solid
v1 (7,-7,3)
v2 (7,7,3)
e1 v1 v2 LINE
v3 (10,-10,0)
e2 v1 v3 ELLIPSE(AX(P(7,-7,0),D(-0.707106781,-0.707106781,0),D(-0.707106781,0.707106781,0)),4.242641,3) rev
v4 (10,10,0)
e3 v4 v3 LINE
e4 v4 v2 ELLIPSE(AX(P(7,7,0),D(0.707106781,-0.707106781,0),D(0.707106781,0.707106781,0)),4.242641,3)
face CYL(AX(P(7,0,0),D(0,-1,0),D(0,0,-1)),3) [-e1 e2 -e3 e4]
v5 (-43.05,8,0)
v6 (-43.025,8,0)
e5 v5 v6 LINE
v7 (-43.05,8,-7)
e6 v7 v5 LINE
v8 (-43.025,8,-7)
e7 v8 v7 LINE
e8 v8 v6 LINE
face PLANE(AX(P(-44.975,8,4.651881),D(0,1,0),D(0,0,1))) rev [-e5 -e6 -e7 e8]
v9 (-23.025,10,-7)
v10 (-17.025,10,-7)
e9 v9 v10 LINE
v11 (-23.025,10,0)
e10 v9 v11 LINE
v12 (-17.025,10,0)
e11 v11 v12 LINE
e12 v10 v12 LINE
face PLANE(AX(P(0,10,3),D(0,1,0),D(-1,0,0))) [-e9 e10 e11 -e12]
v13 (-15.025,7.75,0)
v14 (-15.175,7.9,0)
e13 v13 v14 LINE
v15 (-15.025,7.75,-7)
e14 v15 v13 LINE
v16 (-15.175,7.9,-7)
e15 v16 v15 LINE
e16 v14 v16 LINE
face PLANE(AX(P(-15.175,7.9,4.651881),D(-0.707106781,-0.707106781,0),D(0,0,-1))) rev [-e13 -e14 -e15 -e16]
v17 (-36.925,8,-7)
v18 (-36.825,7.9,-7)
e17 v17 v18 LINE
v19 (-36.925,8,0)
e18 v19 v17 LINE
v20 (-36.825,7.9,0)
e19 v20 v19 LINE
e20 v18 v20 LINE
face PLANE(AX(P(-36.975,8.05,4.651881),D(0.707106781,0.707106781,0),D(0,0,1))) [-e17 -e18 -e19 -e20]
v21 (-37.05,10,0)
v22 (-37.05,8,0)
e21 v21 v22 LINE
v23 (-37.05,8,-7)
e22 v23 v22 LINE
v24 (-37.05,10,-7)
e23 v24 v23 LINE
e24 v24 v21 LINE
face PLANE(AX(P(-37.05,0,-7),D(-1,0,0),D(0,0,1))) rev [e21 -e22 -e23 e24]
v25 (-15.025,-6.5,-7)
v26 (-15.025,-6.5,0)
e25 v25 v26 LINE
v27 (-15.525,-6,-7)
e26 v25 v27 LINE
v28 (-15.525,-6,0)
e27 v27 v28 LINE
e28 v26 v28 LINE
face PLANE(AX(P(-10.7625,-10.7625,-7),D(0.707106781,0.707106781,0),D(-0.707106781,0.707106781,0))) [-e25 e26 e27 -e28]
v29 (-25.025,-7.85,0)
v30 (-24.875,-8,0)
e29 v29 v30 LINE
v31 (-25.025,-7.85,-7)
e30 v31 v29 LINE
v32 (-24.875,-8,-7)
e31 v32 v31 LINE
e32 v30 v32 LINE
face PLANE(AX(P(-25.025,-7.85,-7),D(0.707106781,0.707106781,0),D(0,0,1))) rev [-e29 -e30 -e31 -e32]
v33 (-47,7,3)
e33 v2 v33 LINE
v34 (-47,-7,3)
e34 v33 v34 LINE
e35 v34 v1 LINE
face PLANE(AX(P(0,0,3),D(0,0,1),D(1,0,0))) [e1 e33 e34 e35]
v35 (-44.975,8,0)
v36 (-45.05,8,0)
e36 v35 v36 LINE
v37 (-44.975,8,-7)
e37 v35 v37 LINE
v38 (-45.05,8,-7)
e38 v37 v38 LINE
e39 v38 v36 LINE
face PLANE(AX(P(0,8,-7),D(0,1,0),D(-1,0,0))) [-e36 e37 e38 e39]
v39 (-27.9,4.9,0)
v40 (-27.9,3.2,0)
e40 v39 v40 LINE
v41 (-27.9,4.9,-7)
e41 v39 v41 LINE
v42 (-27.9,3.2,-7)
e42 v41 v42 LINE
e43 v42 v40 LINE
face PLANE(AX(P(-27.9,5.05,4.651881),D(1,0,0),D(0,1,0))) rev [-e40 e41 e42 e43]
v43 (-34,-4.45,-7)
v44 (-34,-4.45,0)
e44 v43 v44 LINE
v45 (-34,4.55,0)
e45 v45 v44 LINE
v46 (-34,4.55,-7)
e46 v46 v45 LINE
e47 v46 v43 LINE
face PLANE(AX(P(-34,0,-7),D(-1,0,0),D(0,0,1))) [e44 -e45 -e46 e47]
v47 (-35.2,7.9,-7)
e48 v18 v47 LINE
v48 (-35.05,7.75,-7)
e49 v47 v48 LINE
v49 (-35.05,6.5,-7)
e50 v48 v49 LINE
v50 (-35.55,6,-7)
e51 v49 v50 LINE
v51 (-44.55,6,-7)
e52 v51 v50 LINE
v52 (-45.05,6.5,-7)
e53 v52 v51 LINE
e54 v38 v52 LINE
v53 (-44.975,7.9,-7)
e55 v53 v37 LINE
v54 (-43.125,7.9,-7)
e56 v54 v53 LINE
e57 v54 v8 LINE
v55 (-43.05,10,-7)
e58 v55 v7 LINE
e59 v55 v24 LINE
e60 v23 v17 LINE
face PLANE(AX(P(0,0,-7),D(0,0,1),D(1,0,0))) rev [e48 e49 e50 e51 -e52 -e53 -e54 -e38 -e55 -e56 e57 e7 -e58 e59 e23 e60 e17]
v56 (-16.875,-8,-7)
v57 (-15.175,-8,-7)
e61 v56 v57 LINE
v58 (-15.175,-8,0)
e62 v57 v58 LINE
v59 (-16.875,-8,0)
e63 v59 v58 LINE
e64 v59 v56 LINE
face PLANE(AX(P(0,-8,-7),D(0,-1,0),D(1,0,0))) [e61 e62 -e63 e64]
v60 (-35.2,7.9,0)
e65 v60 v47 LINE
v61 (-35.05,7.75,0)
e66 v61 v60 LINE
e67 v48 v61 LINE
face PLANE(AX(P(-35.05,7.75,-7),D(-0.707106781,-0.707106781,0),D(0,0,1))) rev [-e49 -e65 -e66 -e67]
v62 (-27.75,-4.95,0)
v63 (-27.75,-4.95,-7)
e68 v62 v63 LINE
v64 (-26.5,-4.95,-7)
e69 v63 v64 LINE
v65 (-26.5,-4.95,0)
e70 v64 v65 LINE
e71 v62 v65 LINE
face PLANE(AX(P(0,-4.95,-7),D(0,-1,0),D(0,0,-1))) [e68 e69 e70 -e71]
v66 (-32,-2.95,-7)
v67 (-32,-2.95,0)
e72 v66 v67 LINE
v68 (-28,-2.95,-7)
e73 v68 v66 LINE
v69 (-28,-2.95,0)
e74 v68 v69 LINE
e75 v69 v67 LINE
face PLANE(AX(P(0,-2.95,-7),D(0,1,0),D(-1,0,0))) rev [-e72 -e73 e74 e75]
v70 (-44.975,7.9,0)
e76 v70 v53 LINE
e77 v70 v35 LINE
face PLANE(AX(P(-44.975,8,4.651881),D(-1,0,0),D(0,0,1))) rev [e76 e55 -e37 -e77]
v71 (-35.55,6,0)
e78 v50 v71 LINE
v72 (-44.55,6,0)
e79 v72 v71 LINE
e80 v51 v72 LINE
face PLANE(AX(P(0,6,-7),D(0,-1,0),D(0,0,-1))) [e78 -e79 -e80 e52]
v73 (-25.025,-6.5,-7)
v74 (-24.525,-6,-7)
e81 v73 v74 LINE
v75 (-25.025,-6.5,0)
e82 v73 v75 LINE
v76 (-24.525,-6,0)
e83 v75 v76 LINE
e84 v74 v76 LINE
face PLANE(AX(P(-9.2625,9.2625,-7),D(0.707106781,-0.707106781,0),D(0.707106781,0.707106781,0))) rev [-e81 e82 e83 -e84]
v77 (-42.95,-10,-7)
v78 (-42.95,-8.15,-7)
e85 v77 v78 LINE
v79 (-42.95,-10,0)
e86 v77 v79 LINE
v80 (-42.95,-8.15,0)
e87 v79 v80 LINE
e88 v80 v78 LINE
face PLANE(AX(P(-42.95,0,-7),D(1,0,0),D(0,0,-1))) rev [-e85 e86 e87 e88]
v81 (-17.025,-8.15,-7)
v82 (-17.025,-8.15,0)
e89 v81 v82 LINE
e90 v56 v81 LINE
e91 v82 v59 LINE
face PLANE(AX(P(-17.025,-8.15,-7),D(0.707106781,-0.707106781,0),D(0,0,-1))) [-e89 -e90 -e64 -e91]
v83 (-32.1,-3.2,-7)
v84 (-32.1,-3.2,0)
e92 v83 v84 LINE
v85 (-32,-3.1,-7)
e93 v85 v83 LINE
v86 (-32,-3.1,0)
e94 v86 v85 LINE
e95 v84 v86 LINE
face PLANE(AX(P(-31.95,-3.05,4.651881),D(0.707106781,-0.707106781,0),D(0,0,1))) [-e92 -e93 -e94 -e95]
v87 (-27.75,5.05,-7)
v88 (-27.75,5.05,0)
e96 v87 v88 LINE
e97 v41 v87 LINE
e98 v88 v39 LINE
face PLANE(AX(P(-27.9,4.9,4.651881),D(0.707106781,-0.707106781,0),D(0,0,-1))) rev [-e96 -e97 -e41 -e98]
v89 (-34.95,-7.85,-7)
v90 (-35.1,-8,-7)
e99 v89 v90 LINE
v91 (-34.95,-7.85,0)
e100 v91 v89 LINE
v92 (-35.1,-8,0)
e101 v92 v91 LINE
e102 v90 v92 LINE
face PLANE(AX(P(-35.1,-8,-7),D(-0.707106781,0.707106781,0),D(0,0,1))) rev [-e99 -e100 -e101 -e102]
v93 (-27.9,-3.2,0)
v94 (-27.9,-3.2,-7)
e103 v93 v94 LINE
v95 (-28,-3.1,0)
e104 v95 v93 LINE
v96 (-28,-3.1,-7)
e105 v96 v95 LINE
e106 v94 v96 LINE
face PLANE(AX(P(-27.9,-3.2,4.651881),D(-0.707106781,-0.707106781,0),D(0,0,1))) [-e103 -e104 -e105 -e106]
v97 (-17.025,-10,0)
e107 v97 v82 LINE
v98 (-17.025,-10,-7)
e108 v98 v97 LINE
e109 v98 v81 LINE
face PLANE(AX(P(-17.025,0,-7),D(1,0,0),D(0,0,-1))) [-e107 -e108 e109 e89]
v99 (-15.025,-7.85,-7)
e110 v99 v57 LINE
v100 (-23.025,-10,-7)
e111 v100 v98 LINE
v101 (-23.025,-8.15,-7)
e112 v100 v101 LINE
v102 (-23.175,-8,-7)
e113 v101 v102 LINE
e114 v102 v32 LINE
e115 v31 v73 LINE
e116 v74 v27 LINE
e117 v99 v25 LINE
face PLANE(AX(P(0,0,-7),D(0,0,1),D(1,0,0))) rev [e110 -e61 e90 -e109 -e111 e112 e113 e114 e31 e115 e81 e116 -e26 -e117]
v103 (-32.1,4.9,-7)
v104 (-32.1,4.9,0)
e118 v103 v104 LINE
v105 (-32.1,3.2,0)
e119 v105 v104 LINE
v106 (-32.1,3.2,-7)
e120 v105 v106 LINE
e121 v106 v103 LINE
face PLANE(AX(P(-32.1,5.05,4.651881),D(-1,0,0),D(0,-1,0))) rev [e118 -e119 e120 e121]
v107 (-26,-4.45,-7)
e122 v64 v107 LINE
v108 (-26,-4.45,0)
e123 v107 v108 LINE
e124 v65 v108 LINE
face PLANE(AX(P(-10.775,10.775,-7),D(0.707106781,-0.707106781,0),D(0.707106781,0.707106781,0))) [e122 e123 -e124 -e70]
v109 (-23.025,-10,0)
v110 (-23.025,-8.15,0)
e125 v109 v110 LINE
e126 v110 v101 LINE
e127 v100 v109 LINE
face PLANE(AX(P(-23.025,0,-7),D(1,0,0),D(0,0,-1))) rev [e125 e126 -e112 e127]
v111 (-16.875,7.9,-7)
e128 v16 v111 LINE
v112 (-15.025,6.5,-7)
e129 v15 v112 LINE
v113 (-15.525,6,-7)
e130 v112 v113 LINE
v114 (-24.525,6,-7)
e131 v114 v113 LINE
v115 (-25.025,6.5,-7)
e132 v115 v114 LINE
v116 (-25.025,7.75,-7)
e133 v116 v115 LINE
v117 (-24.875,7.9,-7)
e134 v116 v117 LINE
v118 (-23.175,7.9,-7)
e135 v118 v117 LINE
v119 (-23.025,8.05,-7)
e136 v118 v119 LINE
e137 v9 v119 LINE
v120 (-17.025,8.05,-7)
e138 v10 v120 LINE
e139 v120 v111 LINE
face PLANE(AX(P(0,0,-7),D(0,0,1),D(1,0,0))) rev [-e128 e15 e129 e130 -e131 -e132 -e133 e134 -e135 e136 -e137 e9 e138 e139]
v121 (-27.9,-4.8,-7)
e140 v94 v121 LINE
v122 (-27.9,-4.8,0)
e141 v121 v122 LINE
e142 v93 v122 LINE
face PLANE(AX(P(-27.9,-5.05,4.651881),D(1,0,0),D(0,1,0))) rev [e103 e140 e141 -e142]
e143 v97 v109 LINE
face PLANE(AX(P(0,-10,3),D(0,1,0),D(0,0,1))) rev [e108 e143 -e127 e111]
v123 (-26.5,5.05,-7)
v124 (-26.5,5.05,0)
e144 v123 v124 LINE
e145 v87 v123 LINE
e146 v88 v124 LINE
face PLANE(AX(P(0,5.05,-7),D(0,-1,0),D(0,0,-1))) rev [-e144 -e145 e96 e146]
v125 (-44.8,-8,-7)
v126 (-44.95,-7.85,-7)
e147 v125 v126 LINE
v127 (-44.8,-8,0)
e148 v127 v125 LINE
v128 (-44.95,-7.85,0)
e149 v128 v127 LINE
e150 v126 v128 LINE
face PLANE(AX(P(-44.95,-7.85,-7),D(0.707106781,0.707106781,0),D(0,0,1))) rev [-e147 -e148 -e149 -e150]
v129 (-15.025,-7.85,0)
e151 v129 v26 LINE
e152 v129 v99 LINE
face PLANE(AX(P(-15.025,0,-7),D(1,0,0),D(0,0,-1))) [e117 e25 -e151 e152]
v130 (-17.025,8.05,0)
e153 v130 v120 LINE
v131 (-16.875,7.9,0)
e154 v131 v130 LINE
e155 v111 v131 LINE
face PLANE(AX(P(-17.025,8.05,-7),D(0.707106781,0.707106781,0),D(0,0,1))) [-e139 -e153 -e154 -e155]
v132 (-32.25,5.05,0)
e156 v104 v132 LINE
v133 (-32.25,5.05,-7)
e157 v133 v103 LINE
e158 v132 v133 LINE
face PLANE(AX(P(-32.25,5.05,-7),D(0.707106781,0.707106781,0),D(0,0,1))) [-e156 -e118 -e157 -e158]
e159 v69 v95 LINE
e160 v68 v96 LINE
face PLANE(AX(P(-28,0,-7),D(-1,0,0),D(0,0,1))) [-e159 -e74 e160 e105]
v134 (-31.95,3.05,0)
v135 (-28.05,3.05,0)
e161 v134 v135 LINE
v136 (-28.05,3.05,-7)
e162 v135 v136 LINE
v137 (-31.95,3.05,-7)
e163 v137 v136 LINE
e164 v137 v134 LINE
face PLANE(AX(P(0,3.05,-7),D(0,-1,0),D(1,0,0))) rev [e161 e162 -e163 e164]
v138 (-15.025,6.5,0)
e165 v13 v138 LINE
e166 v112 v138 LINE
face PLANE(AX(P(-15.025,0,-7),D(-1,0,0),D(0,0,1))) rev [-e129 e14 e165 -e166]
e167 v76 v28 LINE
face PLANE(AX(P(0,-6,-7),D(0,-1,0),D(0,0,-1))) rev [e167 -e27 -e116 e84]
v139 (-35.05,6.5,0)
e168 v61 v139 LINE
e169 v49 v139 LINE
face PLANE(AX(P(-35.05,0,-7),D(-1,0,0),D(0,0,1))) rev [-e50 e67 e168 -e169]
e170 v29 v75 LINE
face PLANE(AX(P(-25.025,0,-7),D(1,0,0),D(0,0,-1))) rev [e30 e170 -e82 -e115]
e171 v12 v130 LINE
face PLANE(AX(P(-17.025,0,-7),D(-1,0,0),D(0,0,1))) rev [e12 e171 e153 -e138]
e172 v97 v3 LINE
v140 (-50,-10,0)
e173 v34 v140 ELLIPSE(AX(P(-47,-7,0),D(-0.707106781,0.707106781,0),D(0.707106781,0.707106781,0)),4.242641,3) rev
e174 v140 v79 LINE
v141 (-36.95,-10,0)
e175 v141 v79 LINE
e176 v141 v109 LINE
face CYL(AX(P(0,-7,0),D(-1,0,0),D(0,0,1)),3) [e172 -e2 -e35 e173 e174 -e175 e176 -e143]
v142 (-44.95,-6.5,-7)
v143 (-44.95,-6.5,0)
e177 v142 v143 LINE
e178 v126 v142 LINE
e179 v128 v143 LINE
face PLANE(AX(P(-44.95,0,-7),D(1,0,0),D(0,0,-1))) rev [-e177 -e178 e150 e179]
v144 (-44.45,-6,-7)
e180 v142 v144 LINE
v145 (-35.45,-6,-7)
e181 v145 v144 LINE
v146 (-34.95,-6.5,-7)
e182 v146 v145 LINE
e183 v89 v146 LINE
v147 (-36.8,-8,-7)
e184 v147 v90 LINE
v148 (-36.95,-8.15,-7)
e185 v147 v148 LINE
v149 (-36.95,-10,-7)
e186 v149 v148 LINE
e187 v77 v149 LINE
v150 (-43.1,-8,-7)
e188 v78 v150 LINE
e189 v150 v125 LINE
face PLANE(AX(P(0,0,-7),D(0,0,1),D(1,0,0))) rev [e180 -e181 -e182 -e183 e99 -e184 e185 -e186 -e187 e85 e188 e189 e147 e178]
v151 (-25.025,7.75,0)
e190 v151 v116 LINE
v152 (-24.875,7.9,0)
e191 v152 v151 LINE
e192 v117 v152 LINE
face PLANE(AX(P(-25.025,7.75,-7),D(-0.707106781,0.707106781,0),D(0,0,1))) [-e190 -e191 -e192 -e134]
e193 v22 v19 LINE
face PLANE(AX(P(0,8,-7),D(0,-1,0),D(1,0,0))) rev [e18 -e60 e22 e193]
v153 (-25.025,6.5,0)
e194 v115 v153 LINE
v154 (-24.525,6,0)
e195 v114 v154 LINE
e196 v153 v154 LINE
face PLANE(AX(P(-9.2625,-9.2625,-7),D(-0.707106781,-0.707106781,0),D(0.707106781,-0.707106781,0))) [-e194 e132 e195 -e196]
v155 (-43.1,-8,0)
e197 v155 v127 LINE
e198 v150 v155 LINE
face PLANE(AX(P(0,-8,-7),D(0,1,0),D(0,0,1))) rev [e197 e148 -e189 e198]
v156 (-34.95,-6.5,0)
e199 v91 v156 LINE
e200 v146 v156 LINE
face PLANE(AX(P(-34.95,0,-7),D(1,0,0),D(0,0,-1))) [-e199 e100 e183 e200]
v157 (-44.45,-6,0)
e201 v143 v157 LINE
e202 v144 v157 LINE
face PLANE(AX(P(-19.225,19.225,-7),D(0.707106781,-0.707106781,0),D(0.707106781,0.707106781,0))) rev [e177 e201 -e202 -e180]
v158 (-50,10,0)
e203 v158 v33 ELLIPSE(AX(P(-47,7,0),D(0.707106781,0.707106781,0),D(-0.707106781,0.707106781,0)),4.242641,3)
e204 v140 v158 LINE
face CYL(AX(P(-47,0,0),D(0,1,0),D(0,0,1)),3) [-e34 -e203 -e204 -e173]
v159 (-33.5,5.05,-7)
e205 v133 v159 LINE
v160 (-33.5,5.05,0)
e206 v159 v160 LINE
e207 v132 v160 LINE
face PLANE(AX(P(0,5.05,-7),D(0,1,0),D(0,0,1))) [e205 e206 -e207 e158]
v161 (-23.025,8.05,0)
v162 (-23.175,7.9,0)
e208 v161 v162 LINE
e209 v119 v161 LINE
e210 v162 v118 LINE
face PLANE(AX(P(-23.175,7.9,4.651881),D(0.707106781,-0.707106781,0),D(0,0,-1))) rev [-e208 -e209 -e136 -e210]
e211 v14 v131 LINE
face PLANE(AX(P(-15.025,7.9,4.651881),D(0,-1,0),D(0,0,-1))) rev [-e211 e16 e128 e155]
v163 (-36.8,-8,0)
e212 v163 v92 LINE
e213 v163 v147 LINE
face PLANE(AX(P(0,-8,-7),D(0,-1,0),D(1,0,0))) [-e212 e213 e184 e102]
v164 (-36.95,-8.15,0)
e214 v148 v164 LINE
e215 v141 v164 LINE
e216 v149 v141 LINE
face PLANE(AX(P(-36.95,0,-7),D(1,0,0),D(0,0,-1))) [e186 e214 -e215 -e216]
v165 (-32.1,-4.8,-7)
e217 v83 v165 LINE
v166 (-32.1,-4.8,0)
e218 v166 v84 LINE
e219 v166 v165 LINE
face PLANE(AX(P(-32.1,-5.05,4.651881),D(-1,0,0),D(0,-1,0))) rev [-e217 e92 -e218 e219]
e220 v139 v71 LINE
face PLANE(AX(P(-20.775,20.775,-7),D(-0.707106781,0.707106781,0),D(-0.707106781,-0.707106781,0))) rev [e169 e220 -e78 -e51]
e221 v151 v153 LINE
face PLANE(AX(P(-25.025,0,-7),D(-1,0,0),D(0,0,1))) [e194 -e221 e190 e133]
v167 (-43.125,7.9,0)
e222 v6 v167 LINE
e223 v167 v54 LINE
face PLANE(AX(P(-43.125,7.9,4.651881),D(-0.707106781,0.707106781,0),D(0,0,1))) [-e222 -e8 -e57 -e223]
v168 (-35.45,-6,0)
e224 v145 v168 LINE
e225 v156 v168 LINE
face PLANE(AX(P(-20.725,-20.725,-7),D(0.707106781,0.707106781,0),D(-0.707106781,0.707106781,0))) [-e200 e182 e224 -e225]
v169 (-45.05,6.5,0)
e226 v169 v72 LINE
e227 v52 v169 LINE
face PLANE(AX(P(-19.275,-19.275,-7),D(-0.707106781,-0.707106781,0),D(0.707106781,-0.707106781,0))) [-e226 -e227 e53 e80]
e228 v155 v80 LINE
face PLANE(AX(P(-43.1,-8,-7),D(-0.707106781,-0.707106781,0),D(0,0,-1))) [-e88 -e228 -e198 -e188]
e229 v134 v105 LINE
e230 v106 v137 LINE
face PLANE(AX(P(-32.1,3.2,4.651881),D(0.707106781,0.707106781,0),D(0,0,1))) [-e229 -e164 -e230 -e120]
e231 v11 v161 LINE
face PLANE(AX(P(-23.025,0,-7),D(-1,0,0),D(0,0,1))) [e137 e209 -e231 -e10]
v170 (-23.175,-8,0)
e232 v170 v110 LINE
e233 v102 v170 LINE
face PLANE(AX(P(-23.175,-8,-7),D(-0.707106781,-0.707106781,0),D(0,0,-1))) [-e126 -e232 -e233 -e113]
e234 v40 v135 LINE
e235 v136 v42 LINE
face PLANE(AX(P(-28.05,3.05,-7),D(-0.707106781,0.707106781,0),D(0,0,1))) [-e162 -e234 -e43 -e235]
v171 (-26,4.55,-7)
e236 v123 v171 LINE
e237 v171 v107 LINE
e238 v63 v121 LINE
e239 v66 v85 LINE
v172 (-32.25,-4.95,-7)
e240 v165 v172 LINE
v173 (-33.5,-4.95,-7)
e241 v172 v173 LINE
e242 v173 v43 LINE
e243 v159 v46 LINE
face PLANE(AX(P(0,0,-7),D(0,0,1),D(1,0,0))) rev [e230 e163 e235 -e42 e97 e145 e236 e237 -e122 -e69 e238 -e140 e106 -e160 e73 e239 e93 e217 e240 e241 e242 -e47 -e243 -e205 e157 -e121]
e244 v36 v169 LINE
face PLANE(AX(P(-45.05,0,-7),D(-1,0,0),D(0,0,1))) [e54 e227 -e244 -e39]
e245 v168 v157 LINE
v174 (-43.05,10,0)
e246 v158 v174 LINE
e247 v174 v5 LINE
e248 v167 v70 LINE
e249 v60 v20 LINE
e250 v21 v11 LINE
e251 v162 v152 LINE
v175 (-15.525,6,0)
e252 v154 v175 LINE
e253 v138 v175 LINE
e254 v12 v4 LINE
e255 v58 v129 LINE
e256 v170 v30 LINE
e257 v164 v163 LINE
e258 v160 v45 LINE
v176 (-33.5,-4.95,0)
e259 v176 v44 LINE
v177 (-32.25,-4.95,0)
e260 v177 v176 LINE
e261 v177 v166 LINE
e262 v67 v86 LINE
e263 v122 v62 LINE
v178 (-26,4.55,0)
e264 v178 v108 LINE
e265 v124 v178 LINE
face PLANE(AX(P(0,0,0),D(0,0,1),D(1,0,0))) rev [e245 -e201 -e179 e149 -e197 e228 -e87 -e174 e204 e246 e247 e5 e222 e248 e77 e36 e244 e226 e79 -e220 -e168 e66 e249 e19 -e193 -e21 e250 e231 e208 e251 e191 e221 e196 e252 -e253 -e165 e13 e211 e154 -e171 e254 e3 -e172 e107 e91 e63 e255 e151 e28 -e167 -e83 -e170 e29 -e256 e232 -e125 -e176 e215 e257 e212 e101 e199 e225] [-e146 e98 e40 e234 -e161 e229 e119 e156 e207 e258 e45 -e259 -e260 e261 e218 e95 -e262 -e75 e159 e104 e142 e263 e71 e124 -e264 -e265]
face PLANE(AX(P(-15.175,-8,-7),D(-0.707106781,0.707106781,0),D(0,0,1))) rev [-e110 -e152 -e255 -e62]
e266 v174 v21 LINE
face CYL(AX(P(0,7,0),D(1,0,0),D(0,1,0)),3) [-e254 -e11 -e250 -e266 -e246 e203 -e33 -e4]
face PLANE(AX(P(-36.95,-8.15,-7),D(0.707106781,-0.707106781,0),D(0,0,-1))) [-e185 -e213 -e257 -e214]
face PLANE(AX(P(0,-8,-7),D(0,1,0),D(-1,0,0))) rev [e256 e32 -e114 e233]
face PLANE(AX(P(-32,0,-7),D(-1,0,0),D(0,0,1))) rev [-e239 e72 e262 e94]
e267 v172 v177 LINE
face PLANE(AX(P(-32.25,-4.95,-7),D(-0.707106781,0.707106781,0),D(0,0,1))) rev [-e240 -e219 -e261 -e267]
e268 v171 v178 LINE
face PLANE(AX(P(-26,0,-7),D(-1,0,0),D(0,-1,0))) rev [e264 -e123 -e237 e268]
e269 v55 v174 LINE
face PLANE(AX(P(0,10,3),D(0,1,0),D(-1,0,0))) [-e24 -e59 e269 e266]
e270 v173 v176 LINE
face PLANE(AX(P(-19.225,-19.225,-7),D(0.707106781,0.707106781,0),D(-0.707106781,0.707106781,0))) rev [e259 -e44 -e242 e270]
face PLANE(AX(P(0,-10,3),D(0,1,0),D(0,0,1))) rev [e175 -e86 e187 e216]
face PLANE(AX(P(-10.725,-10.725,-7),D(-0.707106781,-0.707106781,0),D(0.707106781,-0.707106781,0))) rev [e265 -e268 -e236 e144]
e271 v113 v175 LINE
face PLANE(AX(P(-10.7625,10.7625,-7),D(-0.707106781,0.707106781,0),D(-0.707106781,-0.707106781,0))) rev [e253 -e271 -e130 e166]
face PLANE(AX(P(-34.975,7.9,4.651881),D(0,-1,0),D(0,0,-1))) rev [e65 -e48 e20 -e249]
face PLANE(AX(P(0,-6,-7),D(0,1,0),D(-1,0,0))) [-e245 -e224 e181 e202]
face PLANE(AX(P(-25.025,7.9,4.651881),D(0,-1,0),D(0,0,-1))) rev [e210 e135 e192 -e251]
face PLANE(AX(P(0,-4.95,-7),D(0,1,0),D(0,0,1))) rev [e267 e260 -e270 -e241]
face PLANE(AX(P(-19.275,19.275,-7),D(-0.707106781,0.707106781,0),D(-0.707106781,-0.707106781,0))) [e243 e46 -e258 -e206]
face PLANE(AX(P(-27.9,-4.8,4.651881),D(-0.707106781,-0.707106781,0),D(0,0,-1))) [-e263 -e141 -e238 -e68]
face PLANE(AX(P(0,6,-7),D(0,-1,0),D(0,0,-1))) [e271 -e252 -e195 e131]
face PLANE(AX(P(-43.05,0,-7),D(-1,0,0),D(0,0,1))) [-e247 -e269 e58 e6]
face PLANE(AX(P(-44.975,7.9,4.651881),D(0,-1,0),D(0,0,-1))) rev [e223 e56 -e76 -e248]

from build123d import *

# Parameters (mm, degrees)
SKETCH_1_W          = 60
SKETCH_1_H          = 20
EXTRUDE_1_DEPTH     = 3
EXTRUDE_3_DEPTH     = 7
SKETCH_5_W          = 2
SKETCH_5_H          = 0.1
SKETCH_5_W_2        = 4.2
SKETCH_5_H_2        = 2
CUT_EXTRUDE_2_DEPTH = 7
CHAMFER_1_SIZE      = 0.15
FILLET_1_R          = 3


# Some blends are built 0.0001 mm under size
with BuildPart() as part:
    # 草图1 → 凸台-拉伸1 (new body)
    with BuildSketch(Plane.XY):
        with Locations((-20, 0)):
            Rectangle(SKETCH_1_W, SKETCH_1_H)
    extrude(amount=EXTRUDE_1_DEPTH)

    # 草图1<5> → 凸台-拉伸3 (add)
    with BuildSketch(Plane.XY):
        Polygon((-17.025, 10), (-23.025, 10), (-23.025, 8), (-25.025, 8), (-25.025, 6.5), (-24.525, 6), (-15.525, 6), (-15.025, 6.5), (-15.025, 8), (-17.025, 8), align=None)
        Polygon((-37.05, 10), (-43.05, 10), (-43.05, 8), (-45.05, 8), (-45.05, 6.5), (-44.55, 6), (-35.55, 6), (-35.05, 6.5), (-35.05, 8), (-37.05, 8), align=None)
        Polygon((-26, 4.55), (-26, -4.45), (-26.5, -4.95), (-28, -4.95), (-28, -2.95), (-32, -2.95), (-32, -4.95), (-33.5, -4.95), (-34, -4.45), (-34, 4.55), (-33.5, 5.05), (-32, 5.05), (-32, 3.05), (-28, 3.05), (-28, 5.05), (-26.5, 5.05), align=None)
        Polygon((-23.025, -8), (-23.025, -10), (-17.025, -10), (-17.025, -8), (-15.025, -8), (-15.025, -6.5), (-15.525, -6), (-24.525, -6), (-25.025, -6.5), (-25.025, -8), align=None)
        Polygon((-42.95, -8), (-42.95, -10), (-36.95, -10), (-36.95, -8), (-34.95, -8), (-34.95, -6.5), (-35.45, -6), (-44.45, -6), (-44.95, -6.5), (-44.95, -8), align=None)
    extrude(amount=-EXTRUDE_3_DEPTH)

    # 草图5 → 切除-拉伸2 (cut)
    with BuildSketch(Plane(origin=(0, 0, -7), x_dir=(-1, 0, 0), z_dir=(0, 0, -1))):
        with Locations((16.025, 7.95)):
            Rectangle(SKETCH_5_W, SKETCH_5_H)
        with Locations((24.025, 7.95)):
            Rectangle(SKETCH_5_W, SKETCH_5_H)
        with Locations((35.975, 7.95)):
            Rectangle(SKETCH_5_W, SKETCH_5_H)
        with Locations((43.975, 7.95)):
            Rectangle(SKETCH_5_W, SKETCH_5_H)
        with Locations((30, 4.05)):
            Rectangle(SKETCH_5_W_2, SKETCH_5_H_2)
        with Locations((30, -4.05)):
            Rectangle(SKETCH_5_W_2, SKETCH_5_H_2)
    extrude(amount=-CUT_EXTRUDE_2_DEPTH, mode=Mode.SUBTRACT)

    # 倒角1
    # the kernel refuses this chamfer: 0.15 mm, written as the material it adds along each edge
    with BuildSketch(Plane(origin=(-32.1, -3.05, -7), x_dir=(-0.027495876610573042, -0.9996219169112971, 0), z_dir=(0, 0, 1))) as chamfer_1_piece_1_section:
        Polygon((CHAMFER_1_SIZE * 0.999621916911, CHAMFER_1_SIZE * 0.0274958766106), (-CHAMFER_1_SIZE * 0.0274958766106, CHAMFER_1_SIZE * 0.999621916911), (0, 0), align=None)
    chamfer_1_piece_1 = extrude(amount=7, mode=Mode.PRIVATE)
    chamfer_1_piece_1 = split(chamfer_1_piece_1, bisect_by=Plane(origin=(-32, -3.10460455, -3.5), z_dir=(-1, 0, 0)), keep=Keep.TOP, mode=Mode.PRIVATE)
    add(chamfer_1_piece_1)
    with BuildSketch(Plane(origin=(-32.1, -3.05, -7), x_dir=(-0.027495876610573042, -0.9996219169112971, 0), z_dir=(0, 0, 1))) as chamfer_1_piece_2_section:
        Polygon((CHAMFER_1_SIZE * 0.999621916911, CHAMFER_1_SIZE * 0.0274958766106), (-CHAMFER_1_SIZE * 0.0274958766106, CHAMFER_1_SIZE * 0.999621916911), (0, 0), align=None)
    chamfer_1_piece_2 = extrude(amount=7.385752448, mode=Mode.PRIVATE)
    chamfer_1_piece_2 = split(chamfer_1_piece_2, bisect_by=Plane(origin=(-32.060343707, -3.10460455, 0), z_dir=(0, 0, 1)), keep=Keep.TOP, mode=Mode.PRIVATE)
    chamfer_1_piece_2 = split(chamfer_1_piece_2, bisect_by=Plane(origin=(-32, -3.10460455, 0.192876224), z_dir=(-1, 0, 0)), keep=Keep.TOP, mode=Mode.PRIVATE)
    add(chamfer_1_piece_2)
    with BuildSketch(Plane(origin=(-32.1, -3.05, -7), x_dir=(-0.027495876610573042, -0.9996219169112971, 0), z_dir=(0, 0, 1))) as chamfer_1_piece_3_section:
        Polygon((CHAMFER_1_SIZE * 0.999621916911, CHAMFER_1_SIZE * 0.0274958766106), (-CHAMFER_1_SIZE * 0.0274958766106, CHAMFER_1_SIZE * 0.999621916911), (0, 0), align=None)
    chamfer_1_piece_3 = extrude(amount=7.385752448, mode=Mode.PRIVATE)
    chamfer_1_piece_3 = split(chamfer_1_piece_3, bisect_by=Plane(origin=(-31.98101474, -3.063087711, 0), z_dir=(0, 0, 1)), keep=Keep.TOP, mode=Mode.PRIVATE)
    chamfer_1_piece_3 = split(chamfer_1_piece_3, bisect_by=Plane(origin=(-32, -3.063087711, 0.192876224), z_dir=(1, 0, 0)), keep=Keep.TOP, mode=Mode.PRIVATE)
    add(chamfer_1_piece_3)
    with BuildSketch(Plane(origin=(-27.9, -3.05, -7), x_dir=(-0.9996219169112968, 0.027495876610587344, 0), z_dir=(0, 0, 1))) as chamfer_1_piece_4_section:
        Polygon((CHAMFER_1_SIZE * 0.999621916911, CHAMFER_1_SIZE * 0.0274958766106), (-CHAMFER_1_SIZE * 0.0274958766106, CHAMFER_1_SIZE * 0.999621916911), (0, 0), align=None)
    chamfer_1_piece_4 = extrude(amount=7, mode=Mode.PRIVATE)
    chamfer_1_piece_4 = split(chamfer_1_piece_4, bisect_by=Plane(origin=(-28, -3.10460455, -3.5), z_dir=(1, 0, 0)), keep=Keep.TOP, mode=Mode.PRIVATE)
    add(chamfer_1_piece_4)
    with BuildSketch(Plane(origin=(-27.9, -3.05, -7), x_dir=(-0.9996219169112968, 0.027495876610587344, 0), z_dir=(0, 0, 1))) as chamfer_1_piece_5_section:
        Polygon((CHAMFER_1_SIZE * 0.999621916911, CHAMFER_1_SIZE * 0.0274958766106), (-CHAMFER_1_SIZE * 0.0274958766106, CHAMFER_1_SIZE * 0.999621916911), (0, 0), align=None)
    chamfer_1_piece_5 = extrude(amount=7.385752448, mode=Mode.PRIVATE)
    chamfer_1_piece_5 = split(chamfer_1_piece_5, bisect_by=Plane(origin=(-28.01898526, -3.063087711, 0), z_dir=(0, 0, 1)), keep=Keep.TOP, mode=Mode.PRIVATE)
    chamfer_1_piece_5 = split(chamfer_1_piece_5, bisect_by=Plane(origin=(-28, -3.063087711, 0.192876224), z_dir=(-1, 0, 0)), keep=Keep.TOP, mode=Mode.PRIVATE)
    add(chamfer_1_piece_5)
    with BuildSketch(Plane(origin=(-27.9, -3.05, -7), x_dir=(-0.9996219169112968, 0.027495876610587344, 0), z_dir=(0, 0, 1))) as chamfer_1_piece_6_section:
        Polygon((CHAMFER_1_SIZE * 0.999621916911, CHAMFER_1_SIZE * 0.0274958766106), (-CHAMFER_1_SIZE * 0.0274958766106, CHAMFER_1_SIZE * 0.999621916911), (0, 0), align=None)
    chamfer_1_piece_6 = extrude(amount=7.385752448, mode=Mode.PRIVATE)
    chamfer_1_piece_6 = split(chamfer_1_piece_6, bisect_by=Plane(origin=(-27.939656293, -3.10460455, 0), z_dir=(0, 0, 1)), keep=Keep.TOP, mode=Mode.PRIVATE)
    chamfer_1_piece_6 = split(chamfer_1_piece_6, bisect_by=Plane(origin=(-28, -3.10460455, 0.192876224), z_dir=(1, 0, 0)), keep=Keep.TOP, mode=Mode.PRIVATE)
    add(chamfer_1_piece_6)
    with BuildSketch(Plane(origin=(-32.1, 3.05, -7), x_dir=(0.9996219169112968, -0.027495876610587344, 0), z_dir=(0, 0, 1)), Plane(origin=(-27.9, 3.05, -7), x_dir=(0.02749587661059597, 0.9996219169112964, 0), z_dir=(0, 0, 1)), Plane(origin=(-42.975, 7.9, -7), x_dir=(0.027495876610572963, 0.9996219169112971, 0), z_dir=(0, 0, 1)), Plane(origin=(-23.025, 7.9, -7), x_dir=(0.02749587661059597, 0.9996219169112964, 0), z_dir=(0, 0, 1)), Plane(origin=(-17.025, 7.9, -7), x_dir=(0.9996219169112968, -0.027495876610584464, 0), z_dir=(0, 0, 1))) as chamfer_1_piece_7:
        Polygon((CHAMFER_1_SIZE * 0.999621916911, CHAMFER_1_SIZE * 0.0274958766106), (-CHAMFER_1_SIZE * 0.0274958766106, CHAMFER_1_SIZE * 0.999621916911), (0, 0), align=None)
    extrude(amount=7.385752448)
    with BuildSketch(Plane(origin=(-36.975, 7.9, -7), x_dir=(0.9996219169112968, -0.0274958766105851, 0), z_dir=(0, 0, 1))) as chamfer_1_piece_8_section:
        Polygon((CHAMFER_1_SIZE * 0.999621916911, CHAMFER_1_SIZE * 0.0274958766106), (-CHAMFER_1_SIZE * 0.0274958766106, CHAMFER_1_SIZE * 0.999621916911), (0, 0), align=None)
    chamfer_1_piece_8 = extrude(amount=7, mode=Mode.PRIVATE)
    chamfer_1_piece_8 = split(chamfer_1_piece_8, bisect_by=Plane(origin=(-36.92039545, 8, -3.5), z_dir=(0, -1, 0)), keep=Keep.TOP, mode=Mode.PRIVATE)
    add(chamfer_1_piece_8)
    with BuildSketch(Plane(origin=(-36.975, 7.9, -7), x_dir=(0.9996219169112968, -0.0274958766105851, 0), z_dir=(0, 0, 1))) as chamfer_1_piece_9_section:
        Polygon((CHAMFER_1_SIZE * 0.999621916911, CHAMFER_1_SIZE * 0.0274958766106), (-CHAMFER_1_SIZE * 0.0274958766106, CHAMFER_1_SIZE * 0.999621916911), (0, 0), align=None)
    chamfer_1_piece_9 = extrude(amount=7.385752448, mode=Mode.PRIVATE)
    chamfer_1_piece_9 = split(chamfer_1_piece_9, bisect_by=Plane(origin=(-36.92039545, 7.939656293, 0), z_dir=(0, 0, 1)), keep=Keep.TOP, mode=Mode.PRIVATE)
    chamfer_1_piece_9 = split(chamfer_1_piece_9, bisect_by=Plane(origin=(-36.92039545, 8, 0.192876224), z_dir=(0, -1, 0)), keep=Keep.TOP, mode=Mode.PRIVATE)
    add(chamfer_1_piece_9)
    with BuildSketch(Plane(origin=(-36.975, 7.9, -7), x_dir=(0.9996219169112968, -0.0274958766105851, 0), z_dir=(0, 0, 1))) as chamfer_1_piece_10_section:
        Polygon((CHAMFER_1_SIZE * 0.999621916911, CHAMFER_1_SIZE * 0.0274958766106), (-CHAMFER_1_SIZE * 0.0274958766106, CHAMFER_1_SIZE * 0.999621916911), (0, 0), align=None)
    chamfer_1_piece_10 = extrude(amount=7.385752448, mode=Mode.PRIVATE)
    chamfer_1_piece_10 = split(chamfer_1_piece_10, bisect_by=Plane(origin=(-36.961912289, 8.01898526, 0), z_dir=(0, 0, 1)), keep=Keep.TOP, mode=Mode.PRIVATE)
    chamfer_1_piece_10 = split(chamfer_1_piece_10, bisect_by=Plane(origin=(-36.961912289, 8, 0.192876224), z_dir=(0, 1, 0)), keep=Keep.TOP, mode=Mode.PRIVATE)
    add(chamfer_1_piece_10)
    with BuildSketch(Plane(origin=(-36.95, -8, 0.385752448), x_dir=(-0.027495876610572963, -0.9996219169112971, 0), z_dir=(0, 0, -1)), Plane(origin=(-42.95, -8, 0.385752448), x_dir=(-0.9996219169112968, 0.0274958766105851, 0), z_dir=(0, 0, -1)), Plane(origin=(-17.025, -8, 0.385752448), x_dir=(-0.02749587661059597, -0.9996219169112964, 0), z_dir=(0, 0, -1)), Plane(origin=(-23.025, -8, 0.385752448), x_dir=(-0.9996219169112968, 0.027495876610584464, 0), z_dir=(0, 0, -1))) as chamfer_1_piece_11:
        Polygon((CHAMFER_1_SIZE * 0.999621916911, -CHAMFER_1_SIZE * 0.0274958766106), (-CHAMFER_1_SIZE * 0.0274958766106, -CHAMFER_1_SIZE * 0.999621916911), (0, 0), align=None)
    extrude(amount=7.385752448)
    # the kernel refuses this chamfer: 0.15 mm, written as the material it takes off along each edge
    with BuildSketch(Plane(origin=(-32.1, -4.95, -7.385752448), x_dir=(-0.9996219169112968, -0.0274958766105851, 0), z_dir=(0, 0, 1)), Plane(origin=(-32.1, 5.05, -7.385752448), x_dir=(0.027495876610572963, -0.9996219169112971, 0), z_dir=(0, 0, 1)), Plane(origin=(-27.9, 5.05, -7.385752448), x_dir=(0.9996219169112968, 0.027495876610584464, 0), z_dir=(0, 0, 1)), Plane(origin=(-25.025, 7.9, -7.385752448), x_dir=(0.9996219169112968, 0.027495876610584464, 0), z_dir=(0, 0, 1)), Plane(origin=(-35.05, 7.9, -7.385752448), x_dir=(0.027495876610572963, -0.9996219169112971, 0), z_dir=(0, 0, 1)), Plane(origin=(-15.025, 7.9, -7.385752448), x_dir=(0.027495876610584464, -0.9996219169112968, 0), z_dir=(0, 0, 1))) as chamfer_1_2_piece_1:
        Polygon((CHAMFER_1_SIZE * 0.999621916911, -CHAMFER_1_SIZE * 0.0274958766106), (-CHAMFER_1_SIZE * 0.0274958766106, -CHAMFER_1_SIZE * 0.999621916911), (0, 0), align=None)
    extrude(amount=7.385752448, mode=Mode.SUBTRACT)
    with BuildSketch(Plane(origin=(-27.9, -4.95, 0), x_dir=(-0.02749587661059597, 0.9996219169112964, 0), z_dir=(0, 0, -1)), Plane(origin=(-34.95, -8, 0), x_dir=(-0.9996219169112968, -0.0274958766105851, 0), z_dir=(0, 0, -1)), Plane(origin=(-44.95, -8, 0), x_dir=(-0.027495876610572963, 0.9996219169112971, 0), z_dir=(0, 0, -1)), Plane(origin=(-15.025, -8, 0), x_dir=(-0.9996219169112968, -0.027495876610584464, 0), z_dir=(0, 0, -1)), Plane(origin=(-25.025, -8, 0), x_dir=(-0.02749587661059597, 0.9996219169112964, 0), z_dir=(0, 0, -1))) as chamfer_1_2_piece_2:
        Polygon((CHAMFER_1_SIZE * 0.999621916911, CHAMFER_1_SIZE * 0.0274958766106), (-CHAMFER_1_SIZE * 0.0274958766106, CHAMFER_1_SIZE * 0.999621916911), (0, 0), align=None)
    extrude(amount=7.385752448, mode=Mode.SUBTRACT)

    # 圆角1
    fillet_1_edges = [part.edges().sort_by_distance(p)[0] for p in [
        (10, 0, 3),
        (-20, -10, 3),
        (-20, 10, 3),
        (-50, 0, 3),
    ]]
    fillet(fillet_1_edges, radius=FILLET_1_R - 0.0001)  # a hair under: the kernel refuses the full size


solid = part.part
